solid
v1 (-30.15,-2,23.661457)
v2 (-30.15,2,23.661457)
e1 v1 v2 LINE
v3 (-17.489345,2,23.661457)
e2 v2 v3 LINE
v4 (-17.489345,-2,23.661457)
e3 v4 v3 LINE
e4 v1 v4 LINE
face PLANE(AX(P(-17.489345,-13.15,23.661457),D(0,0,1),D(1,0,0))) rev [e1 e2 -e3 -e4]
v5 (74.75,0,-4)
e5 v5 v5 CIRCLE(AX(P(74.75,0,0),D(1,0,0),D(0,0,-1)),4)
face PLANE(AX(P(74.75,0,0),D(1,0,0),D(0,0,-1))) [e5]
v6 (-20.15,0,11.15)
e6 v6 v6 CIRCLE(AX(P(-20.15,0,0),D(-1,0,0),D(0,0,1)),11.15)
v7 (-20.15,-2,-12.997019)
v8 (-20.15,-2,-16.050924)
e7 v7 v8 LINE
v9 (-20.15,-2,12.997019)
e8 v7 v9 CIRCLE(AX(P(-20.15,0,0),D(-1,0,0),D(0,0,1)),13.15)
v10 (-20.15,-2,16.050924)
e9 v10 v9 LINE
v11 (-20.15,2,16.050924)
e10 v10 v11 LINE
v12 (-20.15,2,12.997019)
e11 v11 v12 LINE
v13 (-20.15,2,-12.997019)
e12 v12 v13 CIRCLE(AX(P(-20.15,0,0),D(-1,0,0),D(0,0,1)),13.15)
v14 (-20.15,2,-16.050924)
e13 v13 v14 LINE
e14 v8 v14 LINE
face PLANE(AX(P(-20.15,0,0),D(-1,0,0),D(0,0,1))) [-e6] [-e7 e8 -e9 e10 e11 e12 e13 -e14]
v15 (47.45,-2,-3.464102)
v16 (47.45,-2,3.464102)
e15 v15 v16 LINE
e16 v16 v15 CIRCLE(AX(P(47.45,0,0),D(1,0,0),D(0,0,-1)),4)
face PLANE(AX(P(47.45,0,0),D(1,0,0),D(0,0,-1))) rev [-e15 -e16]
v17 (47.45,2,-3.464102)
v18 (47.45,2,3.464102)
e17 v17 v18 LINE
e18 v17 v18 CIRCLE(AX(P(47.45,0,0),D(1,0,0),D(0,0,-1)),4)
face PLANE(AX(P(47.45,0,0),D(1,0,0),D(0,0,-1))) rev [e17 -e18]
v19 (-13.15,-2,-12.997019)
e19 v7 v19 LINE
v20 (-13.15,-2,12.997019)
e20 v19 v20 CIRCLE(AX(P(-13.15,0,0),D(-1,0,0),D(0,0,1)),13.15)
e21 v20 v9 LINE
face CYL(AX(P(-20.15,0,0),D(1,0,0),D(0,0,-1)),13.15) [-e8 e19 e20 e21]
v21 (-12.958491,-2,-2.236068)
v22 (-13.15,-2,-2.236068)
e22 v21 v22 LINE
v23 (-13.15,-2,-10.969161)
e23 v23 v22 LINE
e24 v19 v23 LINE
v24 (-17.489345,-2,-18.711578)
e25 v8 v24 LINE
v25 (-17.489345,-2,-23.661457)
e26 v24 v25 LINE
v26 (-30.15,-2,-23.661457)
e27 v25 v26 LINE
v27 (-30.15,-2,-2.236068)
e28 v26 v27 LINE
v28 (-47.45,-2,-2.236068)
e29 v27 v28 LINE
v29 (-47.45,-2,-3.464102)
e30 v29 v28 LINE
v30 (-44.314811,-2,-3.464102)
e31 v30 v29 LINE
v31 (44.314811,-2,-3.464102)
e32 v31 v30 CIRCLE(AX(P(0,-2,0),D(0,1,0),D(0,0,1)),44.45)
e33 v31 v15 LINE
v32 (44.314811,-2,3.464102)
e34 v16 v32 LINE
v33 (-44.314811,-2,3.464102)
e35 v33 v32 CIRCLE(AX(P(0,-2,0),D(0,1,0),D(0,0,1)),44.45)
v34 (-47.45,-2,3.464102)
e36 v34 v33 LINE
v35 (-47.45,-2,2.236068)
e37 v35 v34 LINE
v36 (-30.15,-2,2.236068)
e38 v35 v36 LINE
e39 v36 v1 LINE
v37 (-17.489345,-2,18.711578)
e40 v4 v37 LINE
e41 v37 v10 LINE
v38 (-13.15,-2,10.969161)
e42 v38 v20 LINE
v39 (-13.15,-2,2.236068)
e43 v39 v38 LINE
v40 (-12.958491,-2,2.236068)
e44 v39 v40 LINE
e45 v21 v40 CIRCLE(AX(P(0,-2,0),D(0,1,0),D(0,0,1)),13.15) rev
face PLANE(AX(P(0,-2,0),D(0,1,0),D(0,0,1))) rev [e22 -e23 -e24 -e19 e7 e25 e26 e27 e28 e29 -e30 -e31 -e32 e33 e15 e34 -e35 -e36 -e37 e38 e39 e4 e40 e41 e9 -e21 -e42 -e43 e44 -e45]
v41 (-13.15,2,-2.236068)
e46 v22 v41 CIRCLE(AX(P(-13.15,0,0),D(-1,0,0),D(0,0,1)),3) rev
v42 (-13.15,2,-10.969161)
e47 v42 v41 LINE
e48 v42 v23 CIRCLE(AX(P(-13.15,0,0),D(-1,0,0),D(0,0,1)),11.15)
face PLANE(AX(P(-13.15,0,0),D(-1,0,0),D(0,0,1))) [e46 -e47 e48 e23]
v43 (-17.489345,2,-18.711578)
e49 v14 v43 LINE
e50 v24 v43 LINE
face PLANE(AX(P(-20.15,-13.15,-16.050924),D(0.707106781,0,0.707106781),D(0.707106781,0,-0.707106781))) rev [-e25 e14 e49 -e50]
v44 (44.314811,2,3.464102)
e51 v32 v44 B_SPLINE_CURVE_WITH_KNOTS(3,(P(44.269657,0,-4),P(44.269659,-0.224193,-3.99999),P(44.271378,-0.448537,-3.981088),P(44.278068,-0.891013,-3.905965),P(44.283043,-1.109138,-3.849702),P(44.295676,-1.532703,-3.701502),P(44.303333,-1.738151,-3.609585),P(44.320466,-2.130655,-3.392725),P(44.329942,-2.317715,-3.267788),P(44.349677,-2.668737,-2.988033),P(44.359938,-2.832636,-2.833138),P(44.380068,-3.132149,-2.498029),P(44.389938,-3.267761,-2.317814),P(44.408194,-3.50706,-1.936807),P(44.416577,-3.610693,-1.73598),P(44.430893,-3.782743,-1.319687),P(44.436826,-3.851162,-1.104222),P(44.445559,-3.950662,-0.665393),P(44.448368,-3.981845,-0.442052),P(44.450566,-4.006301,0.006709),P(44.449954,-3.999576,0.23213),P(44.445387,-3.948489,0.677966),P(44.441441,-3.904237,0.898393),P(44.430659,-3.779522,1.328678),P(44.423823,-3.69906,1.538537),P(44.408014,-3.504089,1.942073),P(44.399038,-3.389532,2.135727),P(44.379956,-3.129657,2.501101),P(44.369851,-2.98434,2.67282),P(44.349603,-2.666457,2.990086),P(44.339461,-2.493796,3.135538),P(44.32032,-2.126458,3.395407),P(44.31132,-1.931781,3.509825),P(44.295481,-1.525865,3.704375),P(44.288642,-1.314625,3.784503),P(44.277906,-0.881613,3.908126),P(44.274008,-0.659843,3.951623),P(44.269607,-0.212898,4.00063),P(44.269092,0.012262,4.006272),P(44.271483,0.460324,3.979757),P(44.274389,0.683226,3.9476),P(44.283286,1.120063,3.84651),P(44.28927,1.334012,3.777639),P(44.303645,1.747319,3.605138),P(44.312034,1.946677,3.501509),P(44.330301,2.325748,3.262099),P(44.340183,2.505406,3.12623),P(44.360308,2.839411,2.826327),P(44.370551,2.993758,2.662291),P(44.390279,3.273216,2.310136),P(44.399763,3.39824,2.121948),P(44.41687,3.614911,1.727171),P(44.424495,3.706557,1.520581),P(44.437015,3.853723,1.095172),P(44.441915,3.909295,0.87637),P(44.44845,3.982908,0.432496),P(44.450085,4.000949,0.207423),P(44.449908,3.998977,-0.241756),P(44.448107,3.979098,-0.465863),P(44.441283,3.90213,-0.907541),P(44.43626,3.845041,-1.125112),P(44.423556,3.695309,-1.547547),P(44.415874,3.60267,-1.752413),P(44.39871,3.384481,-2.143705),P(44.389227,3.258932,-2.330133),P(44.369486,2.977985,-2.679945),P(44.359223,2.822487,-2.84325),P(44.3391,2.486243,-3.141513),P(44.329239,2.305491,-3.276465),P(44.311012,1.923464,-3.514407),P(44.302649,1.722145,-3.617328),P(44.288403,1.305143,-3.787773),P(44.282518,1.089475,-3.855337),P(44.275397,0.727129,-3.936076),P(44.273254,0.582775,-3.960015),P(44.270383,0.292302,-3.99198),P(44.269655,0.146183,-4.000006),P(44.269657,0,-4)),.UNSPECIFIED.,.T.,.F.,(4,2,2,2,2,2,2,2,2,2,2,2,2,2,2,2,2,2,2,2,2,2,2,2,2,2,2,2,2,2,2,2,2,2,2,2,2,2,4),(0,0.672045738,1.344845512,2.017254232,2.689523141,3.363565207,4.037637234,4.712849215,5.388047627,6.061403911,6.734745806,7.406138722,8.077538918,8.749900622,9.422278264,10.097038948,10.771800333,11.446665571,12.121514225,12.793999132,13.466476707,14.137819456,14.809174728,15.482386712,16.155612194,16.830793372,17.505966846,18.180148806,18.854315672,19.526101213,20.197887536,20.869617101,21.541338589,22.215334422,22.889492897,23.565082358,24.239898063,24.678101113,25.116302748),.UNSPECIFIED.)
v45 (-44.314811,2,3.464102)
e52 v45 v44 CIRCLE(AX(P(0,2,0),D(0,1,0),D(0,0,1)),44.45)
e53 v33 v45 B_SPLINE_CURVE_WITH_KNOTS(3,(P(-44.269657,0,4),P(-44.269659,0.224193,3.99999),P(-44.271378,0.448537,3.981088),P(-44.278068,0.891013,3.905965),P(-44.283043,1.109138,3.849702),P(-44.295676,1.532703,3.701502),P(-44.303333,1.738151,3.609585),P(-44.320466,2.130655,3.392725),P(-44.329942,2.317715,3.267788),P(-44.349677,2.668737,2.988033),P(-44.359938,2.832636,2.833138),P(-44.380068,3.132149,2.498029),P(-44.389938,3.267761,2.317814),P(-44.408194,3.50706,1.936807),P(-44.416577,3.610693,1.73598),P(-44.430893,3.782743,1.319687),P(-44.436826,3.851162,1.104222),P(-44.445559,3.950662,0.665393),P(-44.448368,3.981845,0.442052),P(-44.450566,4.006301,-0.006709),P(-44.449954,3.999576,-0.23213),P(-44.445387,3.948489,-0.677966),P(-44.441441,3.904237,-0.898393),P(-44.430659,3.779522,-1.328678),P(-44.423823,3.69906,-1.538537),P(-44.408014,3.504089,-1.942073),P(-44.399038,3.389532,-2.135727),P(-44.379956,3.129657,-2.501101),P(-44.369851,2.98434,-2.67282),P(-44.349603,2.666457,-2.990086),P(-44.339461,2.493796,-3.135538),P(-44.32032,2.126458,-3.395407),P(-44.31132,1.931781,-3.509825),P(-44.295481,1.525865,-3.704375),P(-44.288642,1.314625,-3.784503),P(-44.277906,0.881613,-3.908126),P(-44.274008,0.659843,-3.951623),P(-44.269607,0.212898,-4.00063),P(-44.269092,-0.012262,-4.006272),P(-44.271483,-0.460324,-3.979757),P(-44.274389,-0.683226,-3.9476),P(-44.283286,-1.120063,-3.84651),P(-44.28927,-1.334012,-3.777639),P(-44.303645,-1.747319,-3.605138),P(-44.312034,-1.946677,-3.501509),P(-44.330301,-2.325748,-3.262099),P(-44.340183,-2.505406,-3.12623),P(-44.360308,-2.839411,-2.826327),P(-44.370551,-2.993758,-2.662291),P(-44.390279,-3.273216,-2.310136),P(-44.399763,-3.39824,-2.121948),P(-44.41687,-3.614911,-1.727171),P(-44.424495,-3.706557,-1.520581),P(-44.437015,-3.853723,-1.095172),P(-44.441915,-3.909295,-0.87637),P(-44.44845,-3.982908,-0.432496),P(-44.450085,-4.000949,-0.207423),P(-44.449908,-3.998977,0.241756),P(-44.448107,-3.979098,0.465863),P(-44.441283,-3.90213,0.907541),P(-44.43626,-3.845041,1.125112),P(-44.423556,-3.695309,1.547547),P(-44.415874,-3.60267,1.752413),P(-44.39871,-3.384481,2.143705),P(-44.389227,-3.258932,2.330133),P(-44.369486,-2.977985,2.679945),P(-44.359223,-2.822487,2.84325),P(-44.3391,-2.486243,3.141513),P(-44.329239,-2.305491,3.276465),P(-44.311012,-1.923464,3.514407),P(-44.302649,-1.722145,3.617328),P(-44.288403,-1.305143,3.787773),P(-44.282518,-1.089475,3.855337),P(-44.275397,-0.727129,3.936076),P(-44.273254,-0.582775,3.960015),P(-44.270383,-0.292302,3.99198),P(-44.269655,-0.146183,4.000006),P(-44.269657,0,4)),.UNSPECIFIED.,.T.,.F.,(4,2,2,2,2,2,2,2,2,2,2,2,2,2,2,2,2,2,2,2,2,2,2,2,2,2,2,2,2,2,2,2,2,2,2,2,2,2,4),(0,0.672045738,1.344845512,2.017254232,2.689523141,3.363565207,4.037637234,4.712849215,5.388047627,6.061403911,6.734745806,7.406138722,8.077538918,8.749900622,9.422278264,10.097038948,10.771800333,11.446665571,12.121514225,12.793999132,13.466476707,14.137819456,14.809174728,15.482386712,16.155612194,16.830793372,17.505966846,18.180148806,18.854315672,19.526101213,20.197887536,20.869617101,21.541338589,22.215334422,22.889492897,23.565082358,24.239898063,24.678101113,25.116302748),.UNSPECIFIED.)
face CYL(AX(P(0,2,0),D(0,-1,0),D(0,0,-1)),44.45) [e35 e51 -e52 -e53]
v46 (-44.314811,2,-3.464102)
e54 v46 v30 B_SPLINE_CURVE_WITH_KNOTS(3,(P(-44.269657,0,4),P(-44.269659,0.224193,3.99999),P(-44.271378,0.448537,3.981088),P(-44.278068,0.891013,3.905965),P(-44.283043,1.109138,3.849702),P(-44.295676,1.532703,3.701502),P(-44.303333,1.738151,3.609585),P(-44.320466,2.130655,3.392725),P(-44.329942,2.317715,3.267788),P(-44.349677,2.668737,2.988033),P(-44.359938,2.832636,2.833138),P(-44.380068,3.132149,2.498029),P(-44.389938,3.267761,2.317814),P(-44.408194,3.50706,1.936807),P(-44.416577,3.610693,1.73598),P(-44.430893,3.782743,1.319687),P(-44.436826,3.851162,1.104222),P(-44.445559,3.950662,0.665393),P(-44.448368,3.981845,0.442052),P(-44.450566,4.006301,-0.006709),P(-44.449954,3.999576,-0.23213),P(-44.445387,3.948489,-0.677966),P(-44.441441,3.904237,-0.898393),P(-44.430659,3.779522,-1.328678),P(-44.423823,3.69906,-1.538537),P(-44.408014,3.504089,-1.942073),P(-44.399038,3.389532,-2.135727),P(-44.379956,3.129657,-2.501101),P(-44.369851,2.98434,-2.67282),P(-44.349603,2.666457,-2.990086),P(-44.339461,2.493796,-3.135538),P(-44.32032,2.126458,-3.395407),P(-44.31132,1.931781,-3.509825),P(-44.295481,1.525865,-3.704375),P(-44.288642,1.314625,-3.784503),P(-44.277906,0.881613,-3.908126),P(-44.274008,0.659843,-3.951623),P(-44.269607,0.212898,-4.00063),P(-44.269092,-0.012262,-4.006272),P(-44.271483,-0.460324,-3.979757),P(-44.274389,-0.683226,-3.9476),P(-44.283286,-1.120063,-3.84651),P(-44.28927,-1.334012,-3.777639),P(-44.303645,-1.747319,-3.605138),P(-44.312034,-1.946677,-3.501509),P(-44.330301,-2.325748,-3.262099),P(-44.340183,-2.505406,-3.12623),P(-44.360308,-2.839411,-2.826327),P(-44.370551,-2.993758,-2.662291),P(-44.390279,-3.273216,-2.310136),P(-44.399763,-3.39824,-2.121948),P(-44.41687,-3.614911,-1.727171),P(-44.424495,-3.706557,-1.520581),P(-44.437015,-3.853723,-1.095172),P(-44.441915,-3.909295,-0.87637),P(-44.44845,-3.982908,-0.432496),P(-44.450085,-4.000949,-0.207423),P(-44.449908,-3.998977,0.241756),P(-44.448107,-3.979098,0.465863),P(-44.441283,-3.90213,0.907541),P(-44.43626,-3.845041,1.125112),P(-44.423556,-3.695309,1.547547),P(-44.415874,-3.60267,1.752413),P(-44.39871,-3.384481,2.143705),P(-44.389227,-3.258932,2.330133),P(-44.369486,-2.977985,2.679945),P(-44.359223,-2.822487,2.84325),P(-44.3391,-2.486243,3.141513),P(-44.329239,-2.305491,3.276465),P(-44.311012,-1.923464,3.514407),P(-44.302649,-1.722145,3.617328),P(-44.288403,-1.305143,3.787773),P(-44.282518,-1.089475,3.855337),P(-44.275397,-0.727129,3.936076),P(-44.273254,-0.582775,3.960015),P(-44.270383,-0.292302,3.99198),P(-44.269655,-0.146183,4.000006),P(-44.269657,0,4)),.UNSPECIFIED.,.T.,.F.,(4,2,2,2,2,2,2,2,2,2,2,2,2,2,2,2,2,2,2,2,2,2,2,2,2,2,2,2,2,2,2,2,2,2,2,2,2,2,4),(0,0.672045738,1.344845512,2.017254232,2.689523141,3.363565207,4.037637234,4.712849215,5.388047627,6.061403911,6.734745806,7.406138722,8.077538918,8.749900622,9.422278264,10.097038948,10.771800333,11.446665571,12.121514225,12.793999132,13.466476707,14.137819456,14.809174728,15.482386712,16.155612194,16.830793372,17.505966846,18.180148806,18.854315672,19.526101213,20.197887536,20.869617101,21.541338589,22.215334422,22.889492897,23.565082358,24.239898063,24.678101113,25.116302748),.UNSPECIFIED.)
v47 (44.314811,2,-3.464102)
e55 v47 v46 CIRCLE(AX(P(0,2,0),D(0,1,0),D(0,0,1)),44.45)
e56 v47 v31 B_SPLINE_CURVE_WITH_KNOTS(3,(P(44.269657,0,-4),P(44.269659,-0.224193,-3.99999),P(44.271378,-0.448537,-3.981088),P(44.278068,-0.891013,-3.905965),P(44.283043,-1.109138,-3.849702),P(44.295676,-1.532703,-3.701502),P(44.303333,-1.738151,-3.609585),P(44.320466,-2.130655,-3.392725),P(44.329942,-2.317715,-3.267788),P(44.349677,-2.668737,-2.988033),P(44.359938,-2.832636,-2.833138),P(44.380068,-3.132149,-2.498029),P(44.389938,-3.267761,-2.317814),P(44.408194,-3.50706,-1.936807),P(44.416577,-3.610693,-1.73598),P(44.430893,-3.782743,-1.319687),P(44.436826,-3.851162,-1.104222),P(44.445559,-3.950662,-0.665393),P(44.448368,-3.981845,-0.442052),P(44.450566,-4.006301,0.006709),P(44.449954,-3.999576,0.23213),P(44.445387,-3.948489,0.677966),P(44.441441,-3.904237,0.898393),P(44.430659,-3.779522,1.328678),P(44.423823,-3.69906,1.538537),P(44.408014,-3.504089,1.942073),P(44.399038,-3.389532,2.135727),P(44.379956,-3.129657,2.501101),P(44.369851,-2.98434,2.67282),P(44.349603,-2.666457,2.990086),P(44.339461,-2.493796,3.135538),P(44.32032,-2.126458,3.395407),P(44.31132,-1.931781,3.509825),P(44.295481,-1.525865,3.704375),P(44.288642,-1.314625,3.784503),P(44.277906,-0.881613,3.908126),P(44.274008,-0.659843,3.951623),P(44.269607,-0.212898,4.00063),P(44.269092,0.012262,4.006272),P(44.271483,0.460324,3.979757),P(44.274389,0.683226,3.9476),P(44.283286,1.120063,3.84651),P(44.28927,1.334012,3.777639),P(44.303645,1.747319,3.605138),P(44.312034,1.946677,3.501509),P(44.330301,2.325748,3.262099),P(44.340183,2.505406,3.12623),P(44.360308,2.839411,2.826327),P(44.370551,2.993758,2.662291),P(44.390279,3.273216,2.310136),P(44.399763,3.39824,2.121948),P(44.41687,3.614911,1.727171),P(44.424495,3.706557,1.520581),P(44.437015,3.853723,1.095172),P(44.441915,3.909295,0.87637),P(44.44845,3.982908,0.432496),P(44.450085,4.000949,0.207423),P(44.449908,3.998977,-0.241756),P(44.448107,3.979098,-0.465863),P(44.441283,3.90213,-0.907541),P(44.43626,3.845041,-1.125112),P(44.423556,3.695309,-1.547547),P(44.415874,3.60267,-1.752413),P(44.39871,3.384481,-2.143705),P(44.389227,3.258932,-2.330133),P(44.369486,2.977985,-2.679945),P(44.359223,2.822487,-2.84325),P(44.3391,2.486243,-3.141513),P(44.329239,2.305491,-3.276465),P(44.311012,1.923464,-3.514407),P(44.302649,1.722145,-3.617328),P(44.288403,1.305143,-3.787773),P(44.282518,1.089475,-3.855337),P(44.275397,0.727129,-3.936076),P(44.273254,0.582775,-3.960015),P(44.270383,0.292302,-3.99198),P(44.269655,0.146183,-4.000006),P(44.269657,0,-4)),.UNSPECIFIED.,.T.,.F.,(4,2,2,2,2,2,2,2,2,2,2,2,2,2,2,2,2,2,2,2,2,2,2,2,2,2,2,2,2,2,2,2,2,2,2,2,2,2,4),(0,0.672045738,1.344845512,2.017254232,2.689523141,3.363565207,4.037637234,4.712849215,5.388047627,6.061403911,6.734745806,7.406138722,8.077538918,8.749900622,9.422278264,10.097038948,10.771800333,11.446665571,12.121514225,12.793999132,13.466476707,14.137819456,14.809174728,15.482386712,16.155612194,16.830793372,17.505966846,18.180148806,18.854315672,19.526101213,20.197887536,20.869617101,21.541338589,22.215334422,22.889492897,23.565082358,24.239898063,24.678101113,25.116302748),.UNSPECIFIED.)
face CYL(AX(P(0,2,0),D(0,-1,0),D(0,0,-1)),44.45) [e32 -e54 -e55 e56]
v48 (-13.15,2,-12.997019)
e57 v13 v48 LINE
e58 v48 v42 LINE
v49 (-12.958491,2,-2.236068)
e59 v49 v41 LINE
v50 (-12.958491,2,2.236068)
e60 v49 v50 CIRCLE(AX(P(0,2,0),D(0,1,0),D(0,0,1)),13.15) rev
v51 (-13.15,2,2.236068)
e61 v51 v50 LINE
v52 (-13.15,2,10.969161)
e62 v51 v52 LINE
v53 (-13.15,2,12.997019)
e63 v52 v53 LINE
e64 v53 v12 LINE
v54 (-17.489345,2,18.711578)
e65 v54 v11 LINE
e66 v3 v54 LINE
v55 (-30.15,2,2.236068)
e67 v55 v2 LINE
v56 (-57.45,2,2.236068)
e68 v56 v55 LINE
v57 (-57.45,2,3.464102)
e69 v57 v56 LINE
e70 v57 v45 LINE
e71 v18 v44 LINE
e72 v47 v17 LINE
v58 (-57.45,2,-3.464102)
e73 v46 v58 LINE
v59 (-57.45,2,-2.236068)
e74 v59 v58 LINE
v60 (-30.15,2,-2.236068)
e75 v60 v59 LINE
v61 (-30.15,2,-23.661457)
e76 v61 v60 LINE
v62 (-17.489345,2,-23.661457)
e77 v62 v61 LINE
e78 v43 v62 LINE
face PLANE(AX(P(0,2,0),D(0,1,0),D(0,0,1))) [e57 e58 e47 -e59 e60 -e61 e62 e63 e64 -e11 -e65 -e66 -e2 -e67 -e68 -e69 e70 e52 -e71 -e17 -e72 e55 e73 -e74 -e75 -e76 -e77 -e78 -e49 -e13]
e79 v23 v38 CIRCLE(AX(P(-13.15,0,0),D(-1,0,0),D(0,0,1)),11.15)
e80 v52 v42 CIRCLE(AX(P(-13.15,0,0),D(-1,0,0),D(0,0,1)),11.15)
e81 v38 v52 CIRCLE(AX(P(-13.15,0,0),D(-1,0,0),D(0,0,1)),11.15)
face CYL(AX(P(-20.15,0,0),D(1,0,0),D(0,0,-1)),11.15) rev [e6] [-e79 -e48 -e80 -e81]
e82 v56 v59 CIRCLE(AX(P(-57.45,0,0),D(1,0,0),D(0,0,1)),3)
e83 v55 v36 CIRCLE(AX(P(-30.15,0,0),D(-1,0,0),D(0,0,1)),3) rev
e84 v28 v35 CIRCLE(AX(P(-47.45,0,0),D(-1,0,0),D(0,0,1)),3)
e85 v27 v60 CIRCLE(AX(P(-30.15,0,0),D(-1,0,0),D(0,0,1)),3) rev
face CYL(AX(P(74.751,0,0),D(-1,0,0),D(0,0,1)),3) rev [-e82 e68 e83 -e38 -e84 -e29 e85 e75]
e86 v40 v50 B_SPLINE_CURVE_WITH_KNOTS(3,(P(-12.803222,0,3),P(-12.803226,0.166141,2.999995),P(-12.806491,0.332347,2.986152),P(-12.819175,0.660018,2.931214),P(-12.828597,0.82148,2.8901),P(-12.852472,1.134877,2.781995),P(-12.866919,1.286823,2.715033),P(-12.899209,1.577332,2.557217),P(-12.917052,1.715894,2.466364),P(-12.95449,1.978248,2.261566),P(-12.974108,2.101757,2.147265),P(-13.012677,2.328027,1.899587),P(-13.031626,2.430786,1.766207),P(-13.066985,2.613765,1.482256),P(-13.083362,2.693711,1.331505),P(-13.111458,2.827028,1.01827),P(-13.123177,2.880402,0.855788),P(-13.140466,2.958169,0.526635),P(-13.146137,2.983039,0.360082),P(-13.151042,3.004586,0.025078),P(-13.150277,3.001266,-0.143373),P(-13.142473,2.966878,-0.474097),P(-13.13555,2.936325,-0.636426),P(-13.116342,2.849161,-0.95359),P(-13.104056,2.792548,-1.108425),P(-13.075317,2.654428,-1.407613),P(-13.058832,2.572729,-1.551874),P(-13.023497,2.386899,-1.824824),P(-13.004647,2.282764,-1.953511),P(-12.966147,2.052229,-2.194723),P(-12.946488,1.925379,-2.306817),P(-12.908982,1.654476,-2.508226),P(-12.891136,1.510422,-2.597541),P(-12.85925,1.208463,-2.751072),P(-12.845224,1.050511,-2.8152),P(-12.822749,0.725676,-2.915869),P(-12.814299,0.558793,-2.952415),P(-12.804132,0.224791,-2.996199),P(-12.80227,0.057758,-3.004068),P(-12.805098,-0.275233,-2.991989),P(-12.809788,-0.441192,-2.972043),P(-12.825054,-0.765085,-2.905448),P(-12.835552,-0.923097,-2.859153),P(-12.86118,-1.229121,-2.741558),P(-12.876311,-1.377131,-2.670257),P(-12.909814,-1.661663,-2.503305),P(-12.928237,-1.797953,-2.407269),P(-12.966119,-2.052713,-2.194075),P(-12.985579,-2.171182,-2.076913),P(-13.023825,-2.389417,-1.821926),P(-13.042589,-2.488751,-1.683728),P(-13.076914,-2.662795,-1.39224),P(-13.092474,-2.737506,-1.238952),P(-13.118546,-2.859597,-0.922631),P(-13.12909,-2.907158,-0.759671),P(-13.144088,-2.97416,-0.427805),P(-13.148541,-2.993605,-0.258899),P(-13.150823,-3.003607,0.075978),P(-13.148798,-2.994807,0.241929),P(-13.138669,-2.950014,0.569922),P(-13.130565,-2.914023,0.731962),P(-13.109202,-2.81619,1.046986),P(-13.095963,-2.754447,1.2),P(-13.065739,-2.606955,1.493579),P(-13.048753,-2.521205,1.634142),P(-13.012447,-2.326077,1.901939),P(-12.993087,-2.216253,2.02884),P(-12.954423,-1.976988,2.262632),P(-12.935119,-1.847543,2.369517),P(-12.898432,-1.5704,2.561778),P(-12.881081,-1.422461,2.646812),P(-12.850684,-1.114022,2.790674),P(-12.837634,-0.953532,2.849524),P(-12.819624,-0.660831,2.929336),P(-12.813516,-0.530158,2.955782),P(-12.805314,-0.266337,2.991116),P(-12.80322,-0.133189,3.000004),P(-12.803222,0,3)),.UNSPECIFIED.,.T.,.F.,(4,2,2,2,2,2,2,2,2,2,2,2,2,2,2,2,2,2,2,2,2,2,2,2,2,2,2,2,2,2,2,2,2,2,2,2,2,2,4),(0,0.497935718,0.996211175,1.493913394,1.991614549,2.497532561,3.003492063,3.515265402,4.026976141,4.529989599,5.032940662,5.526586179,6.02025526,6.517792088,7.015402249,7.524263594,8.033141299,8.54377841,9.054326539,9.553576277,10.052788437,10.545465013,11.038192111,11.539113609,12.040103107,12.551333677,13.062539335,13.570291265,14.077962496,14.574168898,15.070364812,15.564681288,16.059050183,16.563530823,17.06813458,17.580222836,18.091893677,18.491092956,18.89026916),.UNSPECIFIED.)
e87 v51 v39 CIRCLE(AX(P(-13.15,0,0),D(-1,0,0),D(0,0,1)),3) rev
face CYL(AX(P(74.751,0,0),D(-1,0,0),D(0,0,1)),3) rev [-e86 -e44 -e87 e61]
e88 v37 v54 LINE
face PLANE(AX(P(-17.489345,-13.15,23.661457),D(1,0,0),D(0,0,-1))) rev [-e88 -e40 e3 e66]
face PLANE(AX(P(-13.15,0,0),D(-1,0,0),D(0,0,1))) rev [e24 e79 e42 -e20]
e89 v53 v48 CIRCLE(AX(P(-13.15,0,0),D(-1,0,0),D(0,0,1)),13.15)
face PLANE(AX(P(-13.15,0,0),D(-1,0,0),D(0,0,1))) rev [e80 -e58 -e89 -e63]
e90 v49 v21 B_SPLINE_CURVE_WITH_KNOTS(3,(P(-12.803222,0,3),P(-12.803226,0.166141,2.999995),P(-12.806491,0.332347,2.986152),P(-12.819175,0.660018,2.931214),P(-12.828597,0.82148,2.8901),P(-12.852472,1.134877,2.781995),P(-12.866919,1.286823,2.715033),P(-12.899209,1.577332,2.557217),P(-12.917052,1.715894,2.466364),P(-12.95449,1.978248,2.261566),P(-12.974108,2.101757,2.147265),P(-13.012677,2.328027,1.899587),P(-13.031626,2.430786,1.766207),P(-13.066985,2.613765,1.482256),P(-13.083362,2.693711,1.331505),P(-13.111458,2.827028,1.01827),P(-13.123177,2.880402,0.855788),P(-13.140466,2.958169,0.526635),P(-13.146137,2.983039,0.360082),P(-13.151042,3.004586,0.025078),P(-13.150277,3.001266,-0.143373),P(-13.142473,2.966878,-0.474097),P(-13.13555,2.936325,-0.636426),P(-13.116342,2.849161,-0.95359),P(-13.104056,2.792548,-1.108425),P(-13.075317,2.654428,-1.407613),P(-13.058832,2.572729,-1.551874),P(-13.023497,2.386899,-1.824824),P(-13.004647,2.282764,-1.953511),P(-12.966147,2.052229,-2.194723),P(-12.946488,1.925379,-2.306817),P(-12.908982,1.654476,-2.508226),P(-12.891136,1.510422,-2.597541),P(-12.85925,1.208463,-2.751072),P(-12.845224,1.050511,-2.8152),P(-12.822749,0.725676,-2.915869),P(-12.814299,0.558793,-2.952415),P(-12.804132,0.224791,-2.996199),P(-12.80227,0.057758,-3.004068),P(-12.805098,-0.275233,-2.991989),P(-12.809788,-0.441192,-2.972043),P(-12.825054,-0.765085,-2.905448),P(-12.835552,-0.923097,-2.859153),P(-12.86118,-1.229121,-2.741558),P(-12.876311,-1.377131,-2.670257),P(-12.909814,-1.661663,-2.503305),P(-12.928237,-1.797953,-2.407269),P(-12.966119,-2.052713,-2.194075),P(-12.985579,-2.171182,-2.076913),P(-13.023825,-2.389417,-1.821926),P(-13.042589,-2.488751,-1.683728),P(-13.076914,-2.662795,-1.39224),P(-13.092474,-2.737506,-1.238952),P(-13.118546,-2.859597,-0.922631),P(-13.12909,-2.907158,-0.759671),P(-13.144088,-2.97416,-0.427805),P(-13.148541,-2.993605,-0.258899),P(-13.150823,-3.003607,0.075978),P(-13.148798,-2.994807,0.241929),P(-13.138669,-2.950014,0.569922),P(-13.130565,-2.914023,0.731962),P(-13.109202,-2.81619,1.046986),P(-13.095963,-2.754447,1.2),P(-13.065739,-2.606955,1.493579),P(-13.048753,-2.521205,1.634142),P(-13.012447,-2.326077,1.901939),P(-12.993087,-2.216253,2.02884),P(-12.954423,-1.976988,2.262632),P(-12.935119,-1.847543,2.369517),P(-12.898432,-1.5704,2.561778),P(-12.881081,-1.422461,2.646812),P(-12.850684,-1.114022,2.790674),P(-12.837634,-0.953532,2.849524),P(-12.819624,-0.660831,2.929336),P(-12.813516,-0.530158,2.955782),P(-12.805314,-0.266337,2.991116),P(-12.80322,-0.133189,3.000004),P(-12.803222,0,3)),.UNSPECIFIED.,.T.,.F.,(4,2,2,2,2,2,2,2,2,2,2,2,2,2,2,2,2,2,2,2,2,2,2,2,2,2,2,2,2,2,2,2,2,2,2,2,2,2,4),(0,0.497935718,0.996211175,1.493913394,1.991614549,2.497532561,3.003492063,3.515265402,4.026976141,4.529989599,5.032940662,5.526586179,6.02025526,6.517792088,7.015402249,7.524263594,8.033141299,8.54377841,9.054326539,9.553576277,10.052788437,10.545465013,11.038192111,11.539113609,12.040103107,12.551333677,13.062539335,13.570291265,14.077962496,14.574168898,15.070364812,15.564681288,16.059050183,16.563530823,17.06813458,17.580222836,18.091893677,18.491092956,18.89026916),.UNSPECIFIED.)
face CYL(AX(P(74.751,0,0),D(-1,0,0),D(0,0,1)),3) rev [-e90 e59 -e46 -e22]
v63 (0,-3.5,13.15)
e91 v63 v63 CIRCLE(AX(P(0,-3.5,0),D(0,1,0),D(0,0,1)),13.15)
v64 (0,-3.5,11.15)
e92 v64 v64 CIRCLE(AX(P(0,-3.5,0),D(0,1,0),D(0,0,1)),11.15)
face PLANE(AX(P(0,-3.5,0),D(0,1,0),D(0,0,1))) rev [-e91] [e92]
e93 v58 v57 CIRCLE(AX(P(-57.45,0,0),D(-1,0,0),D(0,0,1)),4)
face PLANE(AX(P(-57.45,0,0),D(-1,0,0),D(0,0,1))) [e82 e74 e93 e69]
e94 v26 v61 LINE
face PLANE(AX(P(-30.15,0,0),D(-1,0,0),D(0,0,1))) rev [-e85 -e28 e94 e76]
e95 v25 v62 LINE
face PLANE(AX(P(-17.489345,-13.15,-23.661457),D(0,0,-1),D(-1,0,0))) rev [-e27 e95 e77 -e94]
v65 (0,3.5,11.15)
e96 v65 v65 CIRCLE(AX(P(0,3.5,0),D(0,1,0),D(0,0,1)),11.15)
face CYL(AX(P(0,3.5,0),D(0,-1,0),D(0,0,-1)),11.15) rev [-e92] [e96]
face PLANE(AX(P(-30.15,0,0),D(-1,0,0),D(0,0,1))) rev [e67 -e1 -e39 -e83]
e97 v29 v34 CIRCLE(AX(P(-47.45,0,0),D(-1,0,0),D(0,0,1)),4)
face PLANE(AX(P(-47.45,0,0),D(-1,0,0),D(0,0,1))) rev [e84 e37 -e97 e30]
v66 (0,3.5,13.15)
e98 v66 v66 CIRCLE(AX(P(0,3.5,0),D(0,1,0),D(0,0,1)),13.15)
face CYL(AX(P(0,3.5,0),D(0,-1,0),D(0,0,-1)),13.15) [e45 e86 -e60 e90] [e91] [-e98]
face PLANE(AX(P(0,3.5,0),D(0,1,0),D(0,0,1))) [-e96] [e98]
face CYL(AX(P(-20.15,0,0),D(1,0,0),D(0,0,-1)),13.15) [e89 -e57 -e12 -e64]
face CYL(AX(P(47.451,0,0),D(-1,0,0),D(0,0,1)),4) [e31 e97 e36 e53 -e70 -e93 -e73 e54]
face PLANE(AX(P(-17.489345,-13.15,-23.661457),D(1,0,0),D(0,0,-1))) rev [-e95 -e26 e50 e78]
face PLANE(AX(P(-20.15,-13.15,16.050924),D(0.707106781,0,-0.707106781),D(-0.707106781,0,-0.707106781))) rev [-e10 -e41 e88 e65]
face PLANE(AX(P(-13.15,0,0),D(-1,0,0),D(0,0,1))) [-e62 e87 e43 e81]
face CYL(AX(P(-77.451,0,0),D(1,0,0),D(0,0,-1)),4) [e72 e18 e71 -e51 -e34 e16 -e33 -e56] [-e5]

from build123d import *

# Parameters (mm, degrees)
SKETCH1_R                    = 44.45
BOSS_EXTRUDE1_DEPTH          = 2
SKETCH5_R                    = 13.15
SKETCH5_R_2                  = 11.15
BOSS_EXTRUDE2_DEPTH          = 3.5
CUT_EXTRUDE2_DEPTH           = 63.959153425
CUT_EXTRUDE2_DEPTH_BACK      = 63.959153425
SKETCH5_2_R                  = 11.15
BOSS_EXTRUDE4_DEPTH          = 2
CUT_EXTRUDE_THIN1_REACH      = 106.853
CUT_EXTRUDE_THIN1_END_RADIUS = 44.45
SKETCH7_R                    = 8
SKETCH7_R_2                  = 4
BOSS_EXTRUDE6_START          = 30
SKETCH7_3_R                  = 4
BOSS_EXTRUDE6_DEPTH          = 30
BOSS_EXTRUDE7_START          = 27.3
SKETCH11_R                   = 4
BOSS_EXTRUDE7_DEPTH          = 27.3
CUT_EXTRUDE3_REACH           = 160.608
CUT_EXTRUDE3_END_RADIUS      = 13.15
SKETCH13_R                   = 3
SKETCH15_R                   = 13.15
SKETCH15_R_2                 = 11.15
BOSS_EXTRUDE8_DEPTH          = 7
SKETCH15_2_R                 = 11.15
CUT_EXTRUDE4_DEPTH           = 17
CUT_EXTRUDE8_DEPTH           = 91.261993798
CUT_EXTRUDE8_DEPTH_BACK      = 91.261993798
CUT_EXTRUDE9_DEPTH           = 131.696461348
CUT_EXTRUDE10_DEPTH          = 20


with BuildPart() as part:
    # Sketch1 → Boss-Extrude1 (new, symmetric)
    with BuildSketch(Plane(origin=(0, 0, 0), x_dir=(1, 0, 0), z_dir=(0, 1, 0))):
        Circle(SKETCH1_R)
    extrude(amount=BOSS_EXTRUDE1_DEPTH, both=True)

    # Sketch5 → Boss-Extrude2 (add, symmetric)
    with BuildSketch(Plane(origin=(0, 0, 0), x_dir=(1, 0, 0), z_dir=(0, 1, 0))):
        Circle(SKETCH5_R)
        Circle(SKETCH5_R_2, mode=Mode.SUBTRACT)
    extrude(amount=BOSS_EXTRUDE2_DEPTH, both=True)

    # Sketch5<2> → Cut-Extrude2 (cut, two sides: drawn at the far end of the back side and taken through both)
    with BuildSketch(Plane(origin=(0, 0, 0), x_dir=(1, 0, 0), z_dir=(0, 1, 0)).offset(-CUT_EXTRUDE2_DEPTH_BACK)):
        Circle(SKETCH5_2_R)
    extrude(amount=CUT_EXTRUDE2_DEPTH + CUT_EXTRUDE2_DEPTH_BACK, mode=Mode.SUBTRACT)

    # Sketch6 → Boss-Extrude4 (add, symmetric)
    with BuildSketch(Plane(origin=(0, 0, 0), x_dir=(1, 0, 0), z_dir=(0, 1, 0))):
        with BuildLine():
            Line((-44.269656651, 4), (-47.45, 4))
            Line((-47.45, 4), (-47.45, -4))
            Line((-47.45, -4), (-44.269656651, -4))
            ThreePointArc((-44.269656651, -4), (-44.45, 0), (-44.269656651, 4))
        make_face()
        with BuildLine():
            Line((47.45, 4), (44.269656651, 4))
            ThreePointArc((44.269656651, 4), (44.45, 0), (44.269656651, -4))
            Line((44.269656651, -4), (47.45, -4))
            Line((47.45, -4), (47.45, 4))
        make_face()
    extrude(amount=BOSS_EXTRUDE4_DEPTH, both=True)

    # Cut-Extrude-Thin1: up to this cylinder (the profile starts outside it)
    cut_extrude_thin1_end = Plane(origin=(0, 0, 0), z_dir=(0, -1, 0)) * Cylinder(CUT_EXTRUDE_THIN1_END_RADIUS, 303.606, mode=Mode.PRIVATE)
    # Sketch7 → Cut-Extrude-Thin1 (cut, up to the surface)
    with BuildSketch(Plane.ZY.offset(47.45), mode=Mode.PRIVATE) as cut_extrude_thin1_sk1:
        Circle(SKETCH7_R)
        Circle(SKETCH7_R_2, mode=Mode.SUBTRACT)
    cut_extrude_thin1_tool1 = extrude(cut_extrude_thin1_sk1.sketch, amount=-CUT_EXTRUDE_THIN1_REACH, mode=Mode.PRIVATE) - cut_extrude_thin1_end
    cut_extrude_thin1 = cut_extrude_thin1_tool1.solids().sort_by_distance((-47.45, 0, -7.773726))[0]
    add(cut_extrude_thin1, mode=Mode.SUBTRACT)

    # Sketch7<3> → Boss-Extrude6 (add)
    with BuildSketch(Plane.ZY.offset(47.45).offset(BOSS_EXTRUDE6_START)):
        Circle(SKETCH7_3_R)
    extrude(amount=-BOSS_EXTRUDE6_DEPTH)

    # Mirror2: Cut-Extrude-Thin1 across plane
    add(cut_extrude_thin1.mirror(Plane(origin=(0, 0, 0), x_dir=(0, 0, 1), z_dir=(1, 0, 0))), mode=Mode.SUBTRACT)

    # Sketch11 → Boss-Extrude7 (add)
    with BuildSketch(Plane(origin=(47.45, 0, 0), x_dir=(0, 0, -1), z_dir=(1, 0, 0)).offset(BOSS_EXTRUDE7_START)):
        Circle(SKETCH11_R)
    extrude(amount=-BOSS_EXTRUDE7_DEPTH)

    # Cut-Extrude3: up to this cylinder (the profile starts outside it)
    cut_extrude3_end = Plane(origin=(0, 0, 0), z_dir=(0, -1, 0)) * Cylinder(CUT_EXTRUDE3_END_RADIUS, 348.516, mode=Mode.PRIVATE)
    # Sketch13 → Cut-Extrude3 (cut, up to the surface)
    with BuildSketch(Plane.ZY.offset(77.45), mode=Mode.PRIVATE) as cut_extrude3_sk1:
        Circle(SKETCH13_R)
    cut_extrude3_tool1 = extrude(cut_extrude3_sk1.sketch, amount=-CUT_EXTRUDE3_REACH, mode=Mode.PRIVATE) - cut_extrude3_end
    add(cut_extrude3_tool1.solids().sort_by_distance((-77.45, 0, 0))[0], mode=Mode.SUBTRACT)

    # Sketch15 → Boss-Extrude8 (add)
    with BuildSketch(Plane.ZY.offset(13.15)):
        Circle(SKETCH15_R)
        Circle(SKETCH15_R_2, mode=Mode.SUBTRACT)
    extrude(amount=BOSS_EXTRUDE8_DEPTH)

    # Sketch15<2> → Cut-Extrude4 (cut)
    with BuildSketch(Plane.ZY.offset(13.15)):
        Circle(SKETCH15_2_R)
    extrude(amount=CUT_EXTRUDE4_DEPTH, mode=Mode.SUBTRACT)

    # Sketch20 → Cut-Extrude8 (cut, two sides: drawn at the far end of the back side and taken through both)
    with BuildSketch(Plane(origin=(0, 0, 0), x_dir=(1, 0, 0), z_dir=(0, 1, 0)).offset(-CUT_EXTRUDE8_DEPTH_BACK)):
        Polygon((-20.15, -12.15), (-20.15, -16.050923592), (-17.489345312, -18.71157828), (-17.489345312, -23.661456888), (-30.15, -23.661456888), (-30.15, 23.661456888), (-17.489345312, 23.661456888), (-17.489345312, 18.71157828), (-20.15, 16.050923592), (-20.15, 12.15), (-20.15, 0), align=None)
    extrude(amount=CUT_EXTRUDE8_DEPTH + CUT_EXTRUDE8_DEPTH_BACK, mode=Mode.SUBTRACT)

    # Sketch23 → Cut-Extrude9 (cut, through all)
    with BuildSketch(Plane(origin=(-47.45, 0, 0), x_dir=(0, 0, -1), z_dir=(1, 0, 0))):
        with BuildLine():
            Line((-3.464101615, 2), (-2.236067977, 2))
            ThreePointArc((-2.236067977, 2), (0, 3), (2.236067977, 2))
            Line((2.236067977, 2), (3.464101615, 2))
            ThreePointArc((3.464101615, 2), (0, 4), (-3.464101615, 2))
        make_face()
    extrude(amount=-CUT_EXTRUDE9_DEPTH, mode=Mode.SUBTRACT)

    # Sketch24 → Cut-Extrude10 (cut)
    with BuildSketch(Plane.ZY.offset(77.45)):
        with BuildLine():
            Line((-2.236067977, 2), (-3.464101615, 2))
            ThreePointArc((-3.464101615, 2), (0, -4), (3.464101615, 2))
            Line((3.464101615, 2), (2.236067977, 2))
            ThreePointArc((2.236067977, 2), (0, -3), (-2.236067977, 2))
        make_face()
    extrude(amount=-CUT_EXTRUDE10_DEPTH, mode=Mode.SUBTRACT)


solid = part.part
